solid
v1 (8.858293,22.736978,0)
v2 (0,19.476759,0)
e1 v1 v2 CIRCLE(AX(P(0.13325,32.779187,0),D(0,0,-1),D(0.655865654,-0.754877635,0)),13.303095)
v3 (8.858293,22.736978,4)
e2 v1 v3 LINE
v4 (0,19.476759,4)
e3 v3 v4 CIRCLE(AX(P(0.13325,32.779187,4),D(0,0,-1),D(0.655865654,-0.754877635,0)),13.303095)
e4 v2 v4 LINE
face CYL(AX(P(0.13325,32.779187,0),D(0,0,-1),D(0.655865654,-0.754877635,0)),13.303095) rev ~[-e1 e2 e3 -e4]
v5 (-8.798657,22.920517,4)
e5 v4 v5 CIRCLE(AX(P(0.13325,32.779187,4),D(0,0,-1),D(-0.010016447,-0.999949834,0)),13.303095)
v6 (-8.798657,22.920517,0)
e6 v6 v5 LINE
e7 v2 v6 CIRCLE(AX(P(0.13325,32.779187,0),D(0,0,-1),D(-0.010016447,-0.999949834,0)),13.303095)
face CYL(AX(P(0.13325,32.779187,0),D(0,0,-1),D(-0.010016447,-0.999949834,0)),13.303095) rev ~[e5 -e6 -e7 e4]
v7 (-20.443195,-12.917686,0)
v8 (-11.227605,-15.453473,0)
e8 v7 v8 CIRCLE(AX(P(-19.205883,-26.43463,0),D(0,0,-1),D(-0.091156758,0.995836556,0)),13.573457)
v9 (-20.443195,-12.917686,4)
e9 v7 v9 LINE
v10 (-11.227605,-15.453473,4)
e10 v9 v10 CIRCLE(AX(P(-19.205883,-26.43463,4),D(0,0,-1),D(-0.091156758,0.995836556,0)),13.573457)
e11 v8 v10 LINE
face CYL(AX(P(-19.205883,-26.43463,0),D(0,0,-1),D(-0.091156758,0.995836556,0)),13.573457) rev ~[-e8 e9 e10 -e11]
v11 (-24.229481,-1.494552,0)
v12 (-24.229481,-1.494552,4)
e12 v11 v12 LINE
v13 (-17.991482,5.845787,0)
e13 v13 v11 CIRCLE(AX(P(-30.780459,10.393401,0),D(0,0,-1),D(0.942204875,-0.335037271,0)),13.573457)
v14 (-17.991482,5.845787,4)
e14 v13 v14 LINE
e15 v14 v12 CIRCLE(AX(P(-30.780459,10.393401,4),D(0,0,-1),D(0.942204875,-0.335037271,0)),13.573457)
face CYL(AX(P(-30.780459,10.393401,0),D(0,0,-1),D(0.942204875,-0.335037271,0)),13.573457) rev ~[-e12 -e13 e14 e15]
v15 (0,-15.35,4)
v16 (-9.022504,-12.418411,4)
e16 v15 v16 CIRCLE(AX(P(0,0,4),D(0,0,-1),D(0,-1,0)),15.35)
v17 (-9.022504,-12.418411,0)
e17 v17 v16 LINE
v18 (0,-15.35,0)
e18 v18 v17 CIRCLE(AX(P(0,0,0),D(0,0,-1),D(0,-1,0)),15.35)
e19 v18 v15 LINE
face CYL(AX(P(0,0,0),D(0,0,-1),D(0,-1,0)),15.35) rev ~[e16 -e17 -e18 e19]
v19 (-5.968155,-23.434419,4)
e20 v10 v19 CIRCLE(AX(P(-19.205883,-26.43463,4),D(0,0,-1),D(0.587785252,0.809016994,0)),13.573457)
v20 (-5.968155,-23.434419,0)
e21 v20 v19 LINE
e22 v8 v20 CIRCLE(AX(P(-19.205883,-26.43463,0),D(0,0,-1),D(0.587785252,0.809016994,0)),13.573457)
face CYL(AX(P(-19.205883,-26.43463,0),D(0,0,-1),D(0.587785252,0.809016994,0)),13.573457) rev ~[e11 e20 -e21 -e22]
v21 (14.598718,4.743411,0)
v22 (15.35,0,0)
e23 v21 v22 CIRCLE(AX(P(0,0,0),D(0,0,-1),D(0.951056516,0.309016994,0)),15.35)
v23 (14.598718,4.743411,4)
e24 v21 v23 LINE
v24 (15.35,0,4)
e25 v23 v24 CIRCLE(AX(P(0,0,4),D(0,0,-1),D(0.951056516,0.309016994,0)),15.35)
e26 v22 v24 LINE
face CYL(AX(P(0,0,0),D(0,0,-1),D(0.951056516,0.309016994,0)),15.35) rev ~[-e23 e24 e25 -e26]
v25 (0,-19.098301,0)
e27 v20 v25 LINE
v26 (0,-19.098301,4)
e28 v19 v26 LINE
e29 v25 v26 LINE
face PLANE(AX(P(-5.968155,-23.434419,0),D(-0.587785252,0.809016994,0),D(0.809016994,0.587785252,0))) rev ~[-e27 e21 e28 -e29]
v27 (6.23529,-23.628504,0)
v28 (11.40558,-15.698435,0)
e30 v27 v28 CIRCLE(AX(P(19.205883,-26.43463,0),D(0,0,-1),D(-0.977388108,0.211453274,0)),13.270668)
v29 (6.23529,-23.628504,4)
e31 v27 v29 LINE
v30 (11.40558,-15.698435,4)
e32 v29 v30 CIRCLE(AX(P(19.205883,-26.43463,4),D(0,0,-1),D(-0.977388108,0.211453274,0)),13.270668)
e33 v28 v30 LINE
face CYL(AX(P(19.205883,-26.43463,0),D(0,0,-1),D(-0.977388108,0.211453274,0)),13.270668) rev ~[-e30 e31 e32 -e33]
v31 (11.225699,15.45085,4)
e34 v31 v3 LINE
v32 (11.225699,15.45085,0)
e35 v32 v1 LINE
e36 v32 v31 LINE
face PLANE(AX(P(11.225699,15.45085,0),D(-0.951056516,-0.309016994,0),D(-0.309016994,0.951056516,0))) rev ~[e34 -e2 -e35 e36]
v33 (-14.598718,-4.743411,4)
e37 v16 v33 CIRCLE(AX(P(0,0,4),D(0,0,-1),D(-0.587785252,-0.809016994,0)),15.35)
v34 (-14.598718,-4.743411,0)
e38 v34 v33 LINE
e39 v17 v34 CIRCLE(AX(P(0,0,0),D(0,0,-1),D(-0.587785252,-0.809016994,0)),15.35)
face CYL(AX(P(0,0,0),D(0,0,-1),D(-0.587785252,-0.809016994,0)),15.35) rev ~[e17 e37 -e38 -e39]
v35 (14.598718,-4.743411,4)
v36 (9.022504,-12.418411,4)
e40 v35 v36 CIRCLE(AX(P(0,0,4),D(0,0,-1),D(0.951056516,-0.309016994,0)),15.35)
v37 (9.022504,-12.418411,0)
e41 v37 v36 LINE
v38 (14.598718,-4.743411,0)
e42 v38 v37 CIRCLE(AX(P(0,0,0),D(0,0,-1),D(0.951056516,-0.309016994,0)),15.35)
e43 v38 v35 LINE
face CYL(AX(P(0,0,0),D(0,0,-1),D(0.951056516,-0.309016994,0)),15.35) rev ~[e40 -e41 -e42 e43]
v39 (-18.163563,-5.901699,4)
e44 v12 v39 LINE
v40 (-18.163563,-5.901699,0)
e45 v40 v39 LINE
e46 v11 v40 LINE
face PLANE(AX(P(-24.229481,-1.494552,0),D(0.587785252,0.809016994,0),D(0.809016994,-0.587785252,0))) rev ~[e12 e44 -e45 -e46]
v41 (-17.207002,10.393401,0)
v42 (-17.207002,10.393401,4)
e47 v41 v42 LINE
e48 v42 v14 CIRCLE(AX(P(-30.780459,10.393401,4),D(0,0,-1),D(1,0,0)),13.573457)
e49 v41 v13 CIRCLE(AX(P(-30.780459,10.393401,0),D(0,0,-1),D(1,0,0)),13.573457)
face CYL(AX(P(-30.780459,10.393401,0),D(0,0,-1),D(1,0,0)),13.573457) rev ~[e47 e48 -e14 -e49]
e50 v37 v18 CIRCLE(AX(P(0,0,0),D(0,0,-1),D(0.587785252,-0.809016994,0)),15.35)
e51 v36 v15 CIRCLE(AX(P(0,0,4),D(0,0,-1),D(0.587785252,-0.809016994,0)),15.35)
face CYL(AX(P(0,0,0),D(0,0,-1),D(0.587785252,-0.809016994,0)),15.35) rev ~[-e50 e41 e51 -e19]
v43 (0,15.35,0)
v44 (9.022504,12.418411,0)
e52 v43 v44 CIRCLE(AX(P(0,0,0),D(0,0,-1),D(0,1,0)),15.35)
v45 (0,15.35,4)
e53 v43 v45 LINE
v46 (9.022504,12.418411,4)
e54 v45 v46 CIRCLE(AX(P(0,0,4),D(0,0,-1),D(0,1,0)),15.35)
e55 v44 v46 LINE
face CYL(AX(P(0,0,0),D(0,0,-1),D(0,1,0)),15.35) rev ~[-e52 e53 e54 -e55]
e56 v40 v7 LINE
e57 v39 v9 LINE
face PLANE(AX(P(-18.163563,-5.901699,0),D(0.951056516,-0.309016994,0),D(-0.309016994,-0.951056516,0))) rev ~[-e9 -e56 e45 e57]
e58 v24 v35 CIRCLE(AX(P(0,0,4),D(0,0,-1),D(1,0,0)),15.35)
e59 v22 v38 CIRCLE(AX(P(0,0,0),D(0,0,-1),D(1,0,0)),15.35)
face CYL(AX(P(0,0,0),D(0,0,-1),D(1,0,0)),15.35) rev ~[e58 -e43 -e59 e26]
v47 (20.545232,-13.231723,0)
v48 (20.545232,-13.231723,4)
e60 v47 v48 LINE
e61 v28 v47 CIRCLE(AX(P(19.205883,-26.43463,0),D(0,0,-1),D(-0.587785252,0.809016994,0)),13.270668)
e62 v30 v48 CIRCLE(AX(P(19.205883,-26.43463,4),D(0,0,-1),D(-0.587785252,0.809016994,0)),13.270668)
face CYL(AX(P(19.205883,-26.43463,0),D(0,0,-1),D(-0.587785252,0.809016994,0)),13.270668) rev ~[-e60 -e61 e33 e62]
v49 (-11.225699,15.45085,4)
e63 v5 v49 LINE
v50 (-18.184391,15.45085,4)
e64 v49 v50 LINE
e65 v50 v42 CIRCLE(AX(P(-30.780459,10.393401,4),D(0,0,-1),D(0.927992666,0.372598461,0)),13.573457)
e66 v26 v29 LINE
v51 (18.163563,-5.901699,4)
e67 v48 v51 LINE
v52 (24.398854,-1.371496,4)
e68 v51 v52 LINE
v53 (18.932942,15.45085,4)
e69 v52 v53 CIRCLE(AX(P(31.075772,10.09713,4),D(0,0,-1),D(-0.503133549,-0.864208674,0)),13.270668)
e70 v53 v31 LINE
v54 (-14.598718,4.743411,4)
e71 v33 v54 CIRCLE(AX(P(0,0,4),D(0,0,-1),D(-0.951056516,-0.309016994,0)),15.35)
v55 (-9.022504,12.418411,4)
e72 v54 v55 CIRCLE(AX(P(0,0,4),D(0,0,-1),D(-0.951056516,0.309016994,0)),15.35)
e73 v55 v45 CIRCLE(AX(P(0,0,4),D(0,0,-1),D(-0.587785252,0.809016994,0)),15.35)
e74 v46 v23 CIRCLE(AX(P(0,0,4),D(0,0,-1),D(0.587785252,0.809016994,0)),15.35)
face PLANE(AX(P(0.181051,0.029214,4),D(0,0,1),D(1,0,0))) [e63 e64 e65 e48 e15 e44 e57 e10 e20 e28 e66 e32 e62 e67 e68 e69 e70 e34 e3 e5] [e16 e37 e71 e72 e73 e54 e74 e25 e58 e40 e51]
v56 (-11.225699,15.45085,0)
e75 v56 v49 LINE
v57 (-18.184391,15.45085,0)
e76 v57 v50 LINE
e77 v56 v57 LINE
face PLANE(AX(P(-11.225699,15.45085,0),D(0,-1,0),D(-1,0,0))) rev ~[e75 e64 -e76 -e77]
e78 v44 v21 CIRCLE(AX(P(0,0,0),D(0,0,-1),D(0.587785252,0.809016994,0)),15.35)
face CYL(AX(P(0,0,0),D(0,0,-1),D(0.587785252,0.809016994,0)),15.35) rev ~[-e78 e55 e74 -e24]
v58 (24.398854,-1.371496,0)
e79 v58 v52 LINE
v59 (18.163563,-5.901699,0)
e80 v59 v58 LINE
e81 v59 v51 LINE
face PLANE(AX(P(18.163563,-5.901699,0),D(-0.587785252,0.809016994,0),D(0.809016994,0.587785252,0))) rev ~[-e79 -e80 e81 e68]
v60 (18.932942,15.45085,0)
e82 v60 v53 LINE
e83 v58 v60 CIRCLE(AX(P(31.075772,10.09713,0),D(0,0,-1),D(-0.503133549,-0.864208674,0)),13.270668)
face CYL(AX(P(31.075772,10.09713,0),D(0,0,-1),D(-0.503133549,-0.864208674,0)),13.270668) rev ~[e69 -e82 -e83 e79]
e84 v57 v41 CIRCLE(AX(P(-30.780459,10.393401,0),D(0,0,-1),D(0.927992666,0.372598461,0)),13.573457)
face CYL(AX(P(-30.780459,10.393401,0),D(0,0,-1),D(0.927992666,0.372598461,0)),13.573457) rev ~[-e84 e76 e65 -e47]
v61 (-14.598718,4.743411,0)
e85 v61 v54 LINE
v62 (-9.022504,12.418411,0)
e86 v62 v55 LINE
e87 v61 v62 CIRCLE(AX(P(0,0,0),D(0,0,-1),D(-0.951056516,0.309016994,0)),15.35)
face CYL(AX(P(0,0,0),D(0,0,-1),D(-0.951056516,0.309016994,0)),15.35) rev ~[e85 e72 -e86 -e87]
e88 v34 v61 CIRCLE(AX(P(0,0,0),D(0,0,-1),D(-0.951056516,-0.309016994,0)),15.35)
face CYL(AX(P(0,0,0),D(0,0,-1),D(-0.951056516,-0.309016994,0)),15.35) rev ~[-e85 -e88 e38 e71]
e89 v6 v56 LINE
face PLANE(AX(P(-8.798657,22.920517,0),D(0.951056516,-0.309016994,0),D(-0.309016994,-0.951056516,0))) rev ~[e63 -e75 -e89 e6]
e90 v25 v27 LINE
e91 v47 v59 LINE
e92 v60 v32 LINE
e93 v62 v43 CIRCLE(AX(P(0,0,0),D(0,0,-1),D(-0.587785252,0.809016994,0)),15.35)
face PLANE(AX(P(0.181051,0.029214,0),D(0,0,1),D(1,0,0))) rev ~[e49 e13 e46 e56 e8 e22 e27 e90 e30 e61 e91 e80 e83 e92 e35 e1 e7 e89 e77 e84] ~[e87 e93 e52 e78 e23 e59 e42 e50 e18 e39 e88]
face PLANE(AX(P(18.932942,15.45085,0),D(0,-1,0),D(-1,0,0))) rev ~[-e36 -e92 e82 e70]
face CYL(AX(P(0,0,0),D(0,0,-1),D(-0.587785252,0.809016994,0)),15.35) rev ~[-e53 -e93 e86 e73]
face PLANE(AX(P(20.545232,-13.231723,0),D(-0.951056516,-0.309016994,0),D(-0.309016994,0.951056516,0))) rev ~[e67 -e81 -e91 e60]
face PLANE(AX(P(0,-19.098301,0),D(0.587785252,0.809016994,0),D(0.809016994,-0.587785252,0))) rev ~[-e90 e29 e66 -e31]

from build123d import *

# Parameters (mm, degrees)
F1_DEPTH = 4


# Not quite as in the source:
# - a feature names something its author has since deleted; it is built from what else it names


with BuildPart() as f1:
    # F0 (on Top) → F1 (new body)
    with BuildSketch(Plane.XY):
        with BuildLine():
            ThreePointArc((-20.4431954222, -12.9176859982), (-15.6048127823, -13.347574962), (-11.2276054917, -15.453473209))
            ThreePointArc((-11.2276054917, -15.453473209), (-7.8721458006, -18.9656863791), (-5.9681546392, -23.4344187216))
            Line((-5.9681546392, -23.4344187216), (0, -19.0983005625))
            Line((0, -19.0983005625), (6.2352903352, -23.6285041655))
            ThreePointArc((6.2352903352, -23.6285041655), (8.0892727444, -19.1867619995), (11.4055803613, -15.6984346018))
            ThreePointArc((11.4055803613, -15.6984346018), (15.747972276, -13.6223910806), (20.5452321785, -13.2317228431))
            Line((20.5452321785, -13.2317228431), (18.1635632001, -5.9016994375))
            Line((18.1635632001, -5.9016994375), (24.3988535354, -1.3714958345))
            ThreePointArc((24.3988535354, -1.3714958345), (18.4546166861, 5.9962684477), (18.9329421283, 15.4508497187))
            Line((18.9329421283, 15.4508497187), (15.537885835, 15.4508497187))
            Line((15.537885835, 15.4508497187), (11.2256994145, 15.4508497187))
            Line((11.2256994145, 15.4508497187), (8.8582927724, 22.7369781668))
            ThreePointArc((8.8582927724, 22.7369781668), (4.7280277023, 20.2947827391), (0, 19.4767594488))
            ThreePointArc((0, 19.4767594488), (-4.7153721091, 20.3911605121), (-8.7986573229, 22.920517208))
            Line((-8.7986573229, 22.920517208), (-11.2256994145, 15.4508497187))
            Line((-11.2256994145, 15.4508497187), (-18.184390629, 15.4508497187))
            ThreePointArc((-18.184390629, 15.4508497187), (-17.4535891597, 12.9689141671), (-17.2070021976, 10.3934006765))
            ThreePointArc((-17.2070021976, 10.3934006765), (-17.4045597984, 8.086010366), (-17.9914818172, 5.8457868068))
            ThreePointArc((-17.9914818172, 5.8457868068), (-20.4374126709, 1.6036270131), (-24.2294812931, -1.4945519715))
            Line((-24.2294812931, -1.4945519715), (-18.1635632001, -5.9016994375))
            Line((-18.1635632001, -5.9016994375), (-20.4431954222, -12.9176859982))
        make_face()
        with BuildLine():
            ThreePointArc((14.5987175251, 4.7434108637), (15.1610160281, 2.4012690384), (15.35, 0))
            ThreePointArc((15.35, 0), (15.1610160281, -2.4012690384), (14.5987175251, -4.7434108637))
            ThreePointArc((14.5987175251, -4.7434108637), (12.4184108637, -9.0225036227), (9.0225036227, -12.4184108637))
            ThreePointArc((9.0225036227, -12.4184108637), (4.7434108637, -14.5987175251), (0, -15.35))
            ThreePointArc((0, -15.35), (-4.7434108637, -14.5987175251), (-9.0225036227, -12.4184108637))
            ThreePointArc((-9.0225036227, -12.4184108637), (-12.4184108637, -9.0225036227), (-14.5987175251, -4.7434108637))
            ThreePointArc((-14.5987175251, -4.7434108637), (-15.35, 0), (-14.5987175251, 4.7434108637))
            ThreePointArc((-14.5987175251, 4.7434108637), (-12.4184108637, 9.0225036227), (-9.0225036227, 12.4184108637))
            ThreePointArc((-9.0225036227, 12.4184108637), (-4.7434108637, 14.5987175251), (0, 15.35))
            ThreePointArc((0, 15.35), (4.7434108637, 14.5987175251), (9.0225036227, 12.4184108637))
            ThreePointArc((9.0225036227, 12.4184108637), (12.4184108637, 9.0225036227), (14.5987175251, 4.7434108637))
        make_face(mode=Mode.SUBTRACT)
    extrude(amount=F1_DEPTH)


solid = f1.part
